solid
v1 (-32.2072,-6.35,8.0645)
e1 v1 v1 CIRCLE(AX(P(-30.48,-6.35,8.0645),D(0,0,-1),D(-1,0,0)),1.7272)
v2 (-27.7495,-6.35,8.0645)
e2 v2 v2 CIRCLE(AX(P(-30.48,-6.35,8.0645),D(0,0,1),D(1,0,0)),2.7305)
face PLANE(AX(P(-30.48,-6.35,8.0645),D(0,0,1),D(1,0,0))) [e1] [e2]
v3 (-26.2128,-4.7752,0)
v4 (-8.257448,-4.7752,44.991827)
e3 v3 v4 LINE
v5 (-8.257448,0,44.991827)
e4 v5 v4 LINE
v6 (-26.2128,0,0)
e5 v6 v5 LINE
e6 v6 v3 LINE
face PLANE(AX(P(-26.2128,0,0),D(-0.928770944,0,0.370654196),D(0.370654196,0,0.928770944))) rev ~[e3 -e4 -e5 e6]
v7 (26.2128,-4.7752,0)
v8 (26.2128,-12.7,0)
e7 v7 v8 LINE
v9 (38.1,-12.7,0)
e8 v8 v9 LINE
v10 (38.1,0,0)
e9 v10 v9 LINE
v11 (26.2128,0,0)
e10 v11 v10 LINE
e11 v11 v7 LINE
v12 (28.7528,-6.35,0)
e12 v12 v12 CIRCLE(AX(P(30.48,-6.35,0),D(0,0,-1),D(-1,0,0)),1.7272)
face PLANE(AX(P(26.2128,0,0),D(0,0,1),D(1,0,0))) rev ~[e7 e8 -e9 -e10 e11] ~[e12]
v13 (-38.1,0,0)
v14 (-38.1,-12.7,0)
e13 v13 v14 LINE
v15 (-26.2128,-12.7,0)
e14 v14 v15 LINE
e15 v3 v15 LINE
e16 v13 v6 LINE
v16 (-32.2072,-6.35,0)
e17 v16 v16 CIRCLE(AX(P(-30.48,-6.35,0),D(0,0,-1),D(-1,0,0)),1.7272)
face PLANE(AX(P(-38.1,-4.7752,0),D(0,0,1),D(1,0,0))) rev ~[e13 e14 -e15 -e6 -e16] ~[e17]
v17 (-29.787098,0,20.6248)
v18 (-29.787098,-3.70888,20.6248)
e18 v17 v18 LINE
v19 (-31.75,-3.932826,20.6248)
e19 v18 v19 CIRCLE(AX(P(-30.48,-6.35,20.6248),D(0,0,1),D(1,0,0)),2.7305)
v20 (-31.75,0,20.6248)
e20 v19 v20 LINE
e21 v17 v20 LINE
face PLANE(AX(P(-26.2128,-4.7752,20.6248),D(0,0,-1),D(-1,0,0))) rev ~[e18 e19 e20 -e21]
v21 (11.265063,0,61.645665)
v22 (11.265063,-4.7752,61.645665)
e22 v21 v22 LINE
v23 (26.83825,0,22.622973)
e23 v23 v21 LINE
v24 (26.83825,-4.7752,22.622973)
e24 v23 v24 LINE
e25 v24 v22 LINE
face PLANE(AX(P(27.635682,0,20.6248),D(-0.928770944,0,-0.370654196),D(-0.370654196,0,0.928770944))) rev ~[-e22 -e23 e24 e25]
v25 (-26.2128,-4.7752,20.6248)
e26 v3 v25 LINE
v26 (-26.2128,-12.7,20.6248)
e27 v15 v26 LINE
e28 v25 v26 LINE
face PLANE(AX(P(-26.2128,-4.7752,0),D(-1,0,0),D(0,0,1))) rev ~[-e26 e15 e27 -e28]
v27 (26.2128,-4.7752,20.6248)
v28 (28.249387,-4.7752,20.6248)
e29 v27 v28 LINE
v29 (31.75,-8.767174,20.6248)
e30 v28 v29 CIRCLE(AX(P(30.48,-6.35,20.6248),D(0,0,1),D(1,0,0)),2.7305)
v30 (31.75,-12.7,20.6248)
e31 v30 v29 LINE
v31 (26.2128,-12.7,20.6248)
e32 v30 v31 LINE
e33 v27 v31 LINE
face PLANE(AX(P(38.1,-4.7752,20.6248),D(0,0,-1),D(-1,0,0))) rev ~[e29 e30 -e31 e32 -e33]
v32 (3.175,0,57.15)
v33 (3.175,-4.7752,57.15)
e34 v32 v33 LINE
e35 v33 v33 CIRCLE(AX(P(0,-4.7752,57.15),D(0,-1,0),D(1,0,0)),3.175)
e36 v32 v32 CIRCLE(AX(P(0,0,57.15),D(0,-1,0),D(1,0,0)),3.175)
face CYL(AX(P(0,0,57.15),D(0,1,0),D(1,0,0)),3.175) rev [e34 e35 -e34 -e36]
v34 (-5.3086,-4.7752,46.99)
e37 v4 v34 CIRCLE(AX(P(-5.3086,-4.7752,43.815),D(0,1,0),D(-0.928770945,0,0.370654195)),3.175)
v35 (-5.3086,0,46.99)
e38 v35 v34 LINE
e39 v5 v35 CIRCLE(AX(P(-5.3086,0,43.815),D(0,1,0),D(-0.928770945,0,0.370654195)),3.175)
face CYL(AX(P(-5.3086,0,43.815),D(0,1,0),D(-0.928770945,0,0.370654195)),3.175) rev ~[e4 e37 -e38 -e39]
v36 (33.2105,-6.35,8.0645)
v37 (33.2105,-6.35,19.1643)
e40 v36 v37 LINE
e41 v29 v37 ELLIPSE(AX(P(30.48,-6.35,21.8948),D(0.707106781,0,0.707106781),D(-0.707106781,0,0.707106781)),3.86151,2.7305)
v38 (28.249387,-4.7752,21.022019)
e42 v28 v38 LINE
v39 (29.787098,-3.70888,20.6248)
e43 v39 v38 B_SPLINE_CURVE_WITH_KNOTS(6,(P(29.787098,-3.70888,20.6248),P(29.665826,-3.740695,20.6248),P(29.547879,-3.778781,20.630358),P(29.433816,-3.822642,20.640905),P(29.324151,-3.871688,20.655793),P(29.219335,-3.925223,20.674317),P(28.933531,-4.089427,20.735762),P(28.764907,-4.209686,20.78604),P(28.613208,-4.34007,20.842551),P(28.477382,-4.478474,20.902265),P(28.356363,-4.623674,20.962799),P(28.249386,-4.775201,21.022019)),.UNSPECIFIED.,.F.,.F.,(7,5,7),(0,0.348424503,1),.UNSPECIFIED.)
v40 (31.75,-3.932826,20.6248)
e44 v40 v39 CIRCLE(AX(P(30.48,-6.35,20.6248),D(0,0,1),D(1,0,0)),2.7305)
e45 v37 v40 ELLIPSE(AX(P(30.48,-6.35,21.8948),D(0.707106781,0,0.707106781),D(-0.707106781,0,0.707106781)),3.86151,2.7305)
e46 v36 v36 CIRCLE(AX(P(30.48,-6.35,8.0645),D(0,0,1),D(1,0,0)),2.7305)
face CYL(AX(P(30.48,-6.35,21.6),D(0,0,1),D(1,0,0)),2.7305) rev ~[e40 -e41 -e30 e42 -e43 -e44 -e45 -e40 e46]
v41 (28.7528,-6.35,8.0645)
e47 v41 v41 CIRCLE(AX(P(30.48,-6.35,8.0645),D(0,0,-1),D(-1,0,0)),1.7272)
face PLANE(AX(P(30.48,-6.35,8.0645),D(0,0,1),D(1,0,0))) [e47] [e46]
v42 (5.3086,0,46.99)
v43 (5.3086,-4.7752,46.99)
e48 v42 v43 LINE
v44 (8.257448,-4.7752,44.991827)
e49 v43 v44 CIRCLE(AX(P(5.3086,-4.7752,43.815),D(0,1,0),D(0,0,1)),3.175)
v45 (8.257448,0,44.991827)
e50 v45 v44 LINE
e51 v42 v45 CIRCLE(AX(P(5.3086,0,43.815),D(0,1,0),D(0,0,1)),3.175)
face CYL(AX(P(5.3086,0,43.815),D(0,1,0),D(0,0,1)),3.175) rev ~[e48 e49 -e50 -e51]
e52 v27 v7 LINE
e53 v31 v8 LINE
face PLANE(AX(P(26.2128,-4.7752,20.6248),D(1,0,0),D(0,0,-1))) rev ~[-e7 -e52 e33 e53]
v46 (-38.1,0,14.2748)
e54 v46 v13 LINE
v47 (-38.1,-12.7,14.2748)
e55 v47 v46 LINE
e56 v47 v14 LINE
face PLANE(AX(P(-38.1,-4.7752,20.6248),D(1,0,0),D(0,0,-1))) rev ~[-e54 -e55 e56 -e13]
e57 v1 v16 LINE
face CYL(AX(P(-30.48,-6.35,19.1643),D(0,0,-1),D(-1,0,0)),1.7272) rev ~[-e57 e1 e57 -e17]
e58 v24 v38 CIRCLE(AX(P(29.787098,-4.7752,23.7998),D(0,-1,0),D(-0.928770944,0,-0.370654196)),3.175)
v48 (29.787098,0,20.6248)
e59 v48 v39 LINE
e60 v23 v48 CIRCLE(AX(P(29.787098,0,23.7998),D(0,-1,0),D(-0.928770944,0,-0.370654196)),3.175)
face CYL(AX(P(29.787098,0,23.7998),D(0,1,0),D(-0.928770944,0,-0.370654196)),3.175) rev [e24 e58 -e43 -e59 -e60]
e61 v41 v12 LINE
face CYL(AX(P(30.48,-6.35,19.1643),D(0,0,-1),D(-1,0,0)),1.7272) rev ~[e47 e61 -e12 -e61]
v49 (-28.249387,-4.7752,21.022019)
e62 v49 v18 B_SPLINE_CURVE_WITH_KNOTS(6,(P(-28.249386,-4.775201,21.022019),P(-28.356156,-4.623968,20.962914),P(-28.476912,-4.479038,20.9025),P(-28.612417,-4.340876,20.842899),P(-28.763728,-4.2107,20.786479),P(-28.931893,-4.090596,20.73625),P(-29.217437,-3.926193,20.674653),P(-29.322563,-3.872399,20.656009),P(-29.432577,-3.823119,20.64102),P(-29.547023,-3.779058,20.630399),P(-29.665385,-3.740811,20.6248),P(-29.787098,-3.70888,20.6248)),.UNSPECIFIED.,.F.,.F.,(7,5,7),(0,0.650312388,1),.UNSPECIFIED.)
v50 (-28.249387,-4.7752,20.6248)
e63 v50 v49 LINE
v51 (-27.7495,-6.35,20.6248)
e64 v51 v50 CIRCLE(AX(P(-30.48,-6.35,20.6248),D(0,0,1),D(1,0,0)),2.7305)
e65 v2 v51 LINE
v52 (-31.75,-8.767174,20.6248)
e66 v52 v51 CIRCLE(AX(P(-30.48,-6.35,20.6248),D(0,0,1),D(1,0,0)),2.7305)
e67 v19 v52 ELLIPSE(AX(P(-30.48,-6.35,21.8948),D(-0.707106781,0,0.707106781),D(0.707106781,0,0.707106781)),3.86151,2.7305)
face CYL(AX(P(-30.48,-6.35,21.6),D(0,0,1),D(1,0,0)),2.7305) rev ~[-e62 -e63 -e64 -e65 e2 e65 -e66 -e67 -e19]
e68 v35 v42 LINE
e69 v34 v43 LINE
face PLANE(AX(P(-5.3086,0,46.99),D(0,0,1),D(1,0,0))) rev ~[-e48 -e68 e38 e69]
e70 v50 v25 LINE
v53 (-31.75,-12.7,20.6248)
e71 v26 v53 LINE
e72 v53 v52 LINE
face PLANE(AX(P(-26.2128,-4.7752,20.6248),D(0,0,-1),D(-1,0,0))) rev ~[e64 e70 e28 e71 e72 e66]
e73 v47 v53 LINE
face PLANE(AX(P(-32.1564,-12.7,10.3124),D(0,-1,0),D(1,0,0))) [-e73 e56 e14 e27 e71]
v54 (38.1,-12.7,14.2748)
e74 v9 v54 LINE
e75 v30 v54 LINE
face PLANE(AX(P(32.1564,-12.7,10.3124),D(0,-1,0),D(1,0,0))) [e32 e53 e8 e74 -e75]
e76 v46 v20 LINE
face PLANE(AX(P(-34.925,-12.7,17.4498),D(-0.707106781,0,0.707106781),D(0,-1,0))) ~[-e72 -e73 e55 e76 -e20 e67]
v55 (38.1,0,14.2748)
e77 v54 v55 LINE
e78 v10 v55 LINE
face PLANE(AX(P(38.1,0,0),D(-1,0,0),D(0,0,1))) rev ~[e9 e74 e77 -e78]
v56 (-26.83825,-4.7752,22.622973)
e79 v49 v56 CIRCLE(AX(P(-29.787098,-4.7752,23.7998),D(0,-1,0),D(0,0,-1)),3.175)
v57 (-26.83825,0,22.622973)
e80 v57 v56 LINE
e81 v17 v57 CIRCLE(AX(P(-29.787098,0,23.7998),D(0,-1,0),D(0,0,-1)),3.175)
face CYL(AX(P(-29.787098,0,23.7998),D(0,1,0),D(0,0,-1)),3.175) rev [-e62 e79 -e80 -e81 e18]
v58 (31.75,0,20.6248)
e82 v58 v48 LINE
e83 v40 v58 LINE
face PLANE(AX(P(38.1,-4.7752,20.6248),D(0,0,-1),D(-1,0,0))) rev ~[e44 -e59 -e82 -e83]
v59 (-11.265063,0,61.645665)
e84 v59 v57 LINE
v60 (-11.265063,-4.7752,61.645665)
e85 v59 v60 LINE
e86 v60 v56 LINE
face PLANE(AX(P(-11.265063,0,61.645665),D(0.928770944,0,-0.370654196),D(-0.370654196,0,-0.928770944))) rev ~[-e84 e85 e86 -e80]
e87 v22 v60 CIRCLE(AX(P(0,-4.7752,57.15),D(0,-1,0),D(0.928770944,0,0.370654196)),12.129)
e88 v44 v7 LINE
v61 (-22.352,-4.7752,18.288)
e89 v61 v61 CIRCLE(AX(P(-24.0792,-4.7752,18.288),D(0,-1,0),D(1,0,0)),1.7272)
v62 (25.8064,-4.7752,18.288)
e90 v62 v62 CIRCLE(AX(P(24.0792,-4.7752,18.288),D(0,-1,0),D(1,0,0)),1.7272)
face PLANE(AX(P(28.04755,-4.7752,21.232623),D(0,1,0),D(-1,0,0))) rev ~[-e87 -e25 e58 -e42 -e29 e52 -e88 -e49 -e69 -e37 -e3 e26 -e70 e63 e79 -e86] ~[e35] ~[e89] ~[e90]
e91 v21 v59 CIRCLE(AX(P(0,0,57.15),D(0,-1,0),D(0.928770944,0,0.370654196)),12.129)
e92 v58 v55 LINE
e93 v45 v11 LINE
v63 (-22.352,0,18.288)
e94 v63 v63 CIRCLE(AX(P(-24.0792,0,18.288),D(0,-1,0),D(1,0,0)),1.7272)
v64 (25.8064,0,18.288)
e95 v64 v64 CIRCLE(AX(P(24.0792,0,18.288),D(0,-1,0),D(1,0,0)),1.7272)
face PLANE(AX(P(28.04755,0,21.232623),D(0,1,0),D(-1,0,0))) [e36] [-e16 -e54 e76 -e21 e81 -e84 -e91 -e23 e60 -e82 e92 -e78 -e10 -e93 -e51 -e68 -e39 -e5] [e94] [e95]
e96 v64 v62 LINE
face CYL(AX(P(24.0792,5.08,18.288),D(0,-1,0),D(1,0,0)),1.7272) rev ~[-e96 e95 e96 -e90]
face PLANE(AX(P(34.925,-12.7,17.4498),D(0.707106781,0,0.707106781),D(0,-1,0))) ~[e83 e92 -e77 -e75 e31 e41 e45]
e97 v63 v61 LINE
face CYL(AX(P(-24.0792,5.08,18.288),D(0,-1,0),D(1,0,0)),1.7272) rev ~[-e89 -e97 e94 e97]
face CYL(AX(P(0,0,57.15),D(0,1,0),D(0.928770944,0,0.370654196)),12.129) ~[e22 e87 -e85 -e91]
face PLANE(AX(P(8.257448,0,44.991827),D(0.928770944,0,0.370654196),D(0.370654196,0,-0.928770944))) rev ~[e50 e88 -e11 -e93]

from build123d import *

# Parameters (mm, degrees)
F0_R           = 3.175
F1_DEPTH       = 4.7752
F3_DEPTH       = 7.9248
F4_SIZE        = 6.35
F6_D           = 3.4544
F6_START       = 1.4605
F6_CBORE_D     = 5.461
F6_CBORE_DEPTH = 11.0998
F8_D           = 3.4544
F8_DEPTH       = 5.08
F8_TIP         = 1.0378064612
F9_T4_DEPTH    = 4.7752
F9_S5_R        = 2.7305
F9_T6_DEPTH    = 4
F9_T10_DEPTH   = 4.7752
F9_S11_R       = 2.7305
F9_T12_DEPTH   = 4


# Not quite as in the source:
# - a fillet or chamfer that OpenCascade refuses, or shapes differently, is made with other operations: its cross-section is extruded or revolved along the edge and cut away or added


with BuildPart() as f1:
    # F0 (on Front) → F1 (new body)
    with BuildSketch(Plane.XZ):
        with BuildLine():
            ThreePointArc((-8.2574477487, 44.9918270709), (-7.0896388893, 46.4434074028), (-5.3086, 46.99))
            Line((-5.3086, 46.99), (5.3086, 46.99))
            ThreePointArc((5.3086, 46.99), (7.0896388893, 46.4434074028), (8.2574477487, 44.9918270709))
            Line((8.2574477487, 44.9918270709), (26.2128, 0))
            Line((26.2128, 0), (38.1, 0))
            Line((38.1, 0), (38.1, 20.6248))
            Line((38.1, 20.6248), (27.6356818802, 20.6248))
            Line((27.6356818802, 20.6248), (11.2650625427, 61.6456646408))
            ThreePointArc((11.2650625427, 61.6456646408), (0, 69.2789997383), (-11.2650625427, 61.6456646408))
            Line((-11.2650625427, 61.6456646408), (-27.6356818802, 20.6248))
            Line((-27.6356818802, 20.6248), (-38.1, 20.6248))
            Line((-38.1, 20.6248), (-38.1, 0))
            Line((-38.1, 0), (-26.2128, 0))
            Line((-26.2128, 0), (-8.2574477487, 44.9918270709))
        make_face()
        with Locations((0, 57.15)):
            Circle(F0_R, mode=Mode.SUBTRACT)
    extrude(amount=F1_DEPTH)

    # F2 (on face) → F3 (join)
    with BuildSketch(Plane.XZ.offset(4.7752)):
        Polygon((-27.6356818802, 20.6248), (-38.1, 20.6248), (-38.1, 0), (-26.2128, 0), (-26.2128, 20.6248), align=None)
        Polygon((38.1, 20.6248), (27.6356818802, 20.6248), (26.2128, 20.6248), (26.2128, 0), (38.1, 0), align=None)
    extrude(amount=F3_DEPTH)

    # F4
    f4_edges = [f1.edges().sort_by_distance(p)[0] for p in [
        (38.1, -6.35, 20.6248),
        (-38.1, -6.35, 20.6248),
    ]]
    chamfer(f4_edges, length=F4_SIZE)

    # F6 (through all)
    # its depths count from where the whole tool has entered the part; down to there all is cleared
    with Locations(Plane.XY.offset(20.6248).offset(-F6_START)):
        with Locations((-30.48, -6.35), (30.48, -6.35)):
            CounterBoreHole(F6_D / 2, F6_CBORE_D / 2, F6_CBORE_DEPTH)

    # F8
    with Locations(Plane(origin=(0, 0, 0), x_dir=(-1, 0, 0), z_dir=(0, 1, 0))):
        with Locations((-24.0792, 18.288), (24.0792, 18.288)):
            Hole(F8_D / 2, depth=F8_DEPTH)
            with Locations((0, 0, -(F8_DEPTH + F8_TIP / 2))):  # 118° drill point
                Cone(0, F8_D / 2, F8_TIP, mode=Mode.SUBTRACT)

    # F9: fillet of radius 3.175 on 2 edges, made by hand


with BuildPart() as f9_tool2:
    # F9_s3 → F9_t4 (new body)
    with BuildSketch(Plane.XZ):
        with BuildLine():
            ThreePointArc((-29.7870981589, 20.6248), (-28.0060592696, 21.1713925972), (-26.8382504101, 22.6229729291))
            Line((-26.8382504101, 22.6229729291), (-27.6356818802, 20.6248))
            Line((-27.6356818802, 20.6248), (-29.7870981589, 20.6248))
        make_face()
    extrude(amount=F9_T4_DEPTH)

    # F9_s5 → F9_t6 (cut, symmetric)
    with BuildSketch(Plane.XY.offset(21.6)):
        with Locations((-30.48, -6.35)):
            Circle(F9_S5_R)
    extrude(amount=F9_T6_DEPTH, both=True, mode=Mode.SUBTRACT)


with BuildPart() as f1_1:
    add(f1.part)

    # F9_t1: union F9_tool2
    add(f9_tool2.part)


with BuildPart() as f9_tool8:
    # F9_s9 → F9_t10 (new body)
    with BuildSketch(Plane.XZ):
        with BuildLine():
            ThreePointArc((26.8382504101, 22.6229729291), (28.0060592696, 21.1713925972), (29.7870981589, 20.6248))
            Line((29.7870981589, 20.6248), (27.6356818802, 20.6248))
            Line((27.6356818802, 20.6248), (26.8382504101, 22.6229729291))
        make_face()
    extrude(amount=F9_T10_DEPTH)

    # F9_s11 → F9_t12 (cut, symmetric)
    with BuildSketch(Plane.XY.offset(21.6)):
        with Locations((30.48, -6.35)):
            Circle(F9_S11_R)
    extrude(amount=F9_T12_DEPTH, both=True, mode=Mode.SUBTRACT)


with BuildPart() as f1_2:
    add(f1_1.part)

    # F9_t7: union F9_tool8
    add(f9_tool8.part)


solid = f1_2.part
